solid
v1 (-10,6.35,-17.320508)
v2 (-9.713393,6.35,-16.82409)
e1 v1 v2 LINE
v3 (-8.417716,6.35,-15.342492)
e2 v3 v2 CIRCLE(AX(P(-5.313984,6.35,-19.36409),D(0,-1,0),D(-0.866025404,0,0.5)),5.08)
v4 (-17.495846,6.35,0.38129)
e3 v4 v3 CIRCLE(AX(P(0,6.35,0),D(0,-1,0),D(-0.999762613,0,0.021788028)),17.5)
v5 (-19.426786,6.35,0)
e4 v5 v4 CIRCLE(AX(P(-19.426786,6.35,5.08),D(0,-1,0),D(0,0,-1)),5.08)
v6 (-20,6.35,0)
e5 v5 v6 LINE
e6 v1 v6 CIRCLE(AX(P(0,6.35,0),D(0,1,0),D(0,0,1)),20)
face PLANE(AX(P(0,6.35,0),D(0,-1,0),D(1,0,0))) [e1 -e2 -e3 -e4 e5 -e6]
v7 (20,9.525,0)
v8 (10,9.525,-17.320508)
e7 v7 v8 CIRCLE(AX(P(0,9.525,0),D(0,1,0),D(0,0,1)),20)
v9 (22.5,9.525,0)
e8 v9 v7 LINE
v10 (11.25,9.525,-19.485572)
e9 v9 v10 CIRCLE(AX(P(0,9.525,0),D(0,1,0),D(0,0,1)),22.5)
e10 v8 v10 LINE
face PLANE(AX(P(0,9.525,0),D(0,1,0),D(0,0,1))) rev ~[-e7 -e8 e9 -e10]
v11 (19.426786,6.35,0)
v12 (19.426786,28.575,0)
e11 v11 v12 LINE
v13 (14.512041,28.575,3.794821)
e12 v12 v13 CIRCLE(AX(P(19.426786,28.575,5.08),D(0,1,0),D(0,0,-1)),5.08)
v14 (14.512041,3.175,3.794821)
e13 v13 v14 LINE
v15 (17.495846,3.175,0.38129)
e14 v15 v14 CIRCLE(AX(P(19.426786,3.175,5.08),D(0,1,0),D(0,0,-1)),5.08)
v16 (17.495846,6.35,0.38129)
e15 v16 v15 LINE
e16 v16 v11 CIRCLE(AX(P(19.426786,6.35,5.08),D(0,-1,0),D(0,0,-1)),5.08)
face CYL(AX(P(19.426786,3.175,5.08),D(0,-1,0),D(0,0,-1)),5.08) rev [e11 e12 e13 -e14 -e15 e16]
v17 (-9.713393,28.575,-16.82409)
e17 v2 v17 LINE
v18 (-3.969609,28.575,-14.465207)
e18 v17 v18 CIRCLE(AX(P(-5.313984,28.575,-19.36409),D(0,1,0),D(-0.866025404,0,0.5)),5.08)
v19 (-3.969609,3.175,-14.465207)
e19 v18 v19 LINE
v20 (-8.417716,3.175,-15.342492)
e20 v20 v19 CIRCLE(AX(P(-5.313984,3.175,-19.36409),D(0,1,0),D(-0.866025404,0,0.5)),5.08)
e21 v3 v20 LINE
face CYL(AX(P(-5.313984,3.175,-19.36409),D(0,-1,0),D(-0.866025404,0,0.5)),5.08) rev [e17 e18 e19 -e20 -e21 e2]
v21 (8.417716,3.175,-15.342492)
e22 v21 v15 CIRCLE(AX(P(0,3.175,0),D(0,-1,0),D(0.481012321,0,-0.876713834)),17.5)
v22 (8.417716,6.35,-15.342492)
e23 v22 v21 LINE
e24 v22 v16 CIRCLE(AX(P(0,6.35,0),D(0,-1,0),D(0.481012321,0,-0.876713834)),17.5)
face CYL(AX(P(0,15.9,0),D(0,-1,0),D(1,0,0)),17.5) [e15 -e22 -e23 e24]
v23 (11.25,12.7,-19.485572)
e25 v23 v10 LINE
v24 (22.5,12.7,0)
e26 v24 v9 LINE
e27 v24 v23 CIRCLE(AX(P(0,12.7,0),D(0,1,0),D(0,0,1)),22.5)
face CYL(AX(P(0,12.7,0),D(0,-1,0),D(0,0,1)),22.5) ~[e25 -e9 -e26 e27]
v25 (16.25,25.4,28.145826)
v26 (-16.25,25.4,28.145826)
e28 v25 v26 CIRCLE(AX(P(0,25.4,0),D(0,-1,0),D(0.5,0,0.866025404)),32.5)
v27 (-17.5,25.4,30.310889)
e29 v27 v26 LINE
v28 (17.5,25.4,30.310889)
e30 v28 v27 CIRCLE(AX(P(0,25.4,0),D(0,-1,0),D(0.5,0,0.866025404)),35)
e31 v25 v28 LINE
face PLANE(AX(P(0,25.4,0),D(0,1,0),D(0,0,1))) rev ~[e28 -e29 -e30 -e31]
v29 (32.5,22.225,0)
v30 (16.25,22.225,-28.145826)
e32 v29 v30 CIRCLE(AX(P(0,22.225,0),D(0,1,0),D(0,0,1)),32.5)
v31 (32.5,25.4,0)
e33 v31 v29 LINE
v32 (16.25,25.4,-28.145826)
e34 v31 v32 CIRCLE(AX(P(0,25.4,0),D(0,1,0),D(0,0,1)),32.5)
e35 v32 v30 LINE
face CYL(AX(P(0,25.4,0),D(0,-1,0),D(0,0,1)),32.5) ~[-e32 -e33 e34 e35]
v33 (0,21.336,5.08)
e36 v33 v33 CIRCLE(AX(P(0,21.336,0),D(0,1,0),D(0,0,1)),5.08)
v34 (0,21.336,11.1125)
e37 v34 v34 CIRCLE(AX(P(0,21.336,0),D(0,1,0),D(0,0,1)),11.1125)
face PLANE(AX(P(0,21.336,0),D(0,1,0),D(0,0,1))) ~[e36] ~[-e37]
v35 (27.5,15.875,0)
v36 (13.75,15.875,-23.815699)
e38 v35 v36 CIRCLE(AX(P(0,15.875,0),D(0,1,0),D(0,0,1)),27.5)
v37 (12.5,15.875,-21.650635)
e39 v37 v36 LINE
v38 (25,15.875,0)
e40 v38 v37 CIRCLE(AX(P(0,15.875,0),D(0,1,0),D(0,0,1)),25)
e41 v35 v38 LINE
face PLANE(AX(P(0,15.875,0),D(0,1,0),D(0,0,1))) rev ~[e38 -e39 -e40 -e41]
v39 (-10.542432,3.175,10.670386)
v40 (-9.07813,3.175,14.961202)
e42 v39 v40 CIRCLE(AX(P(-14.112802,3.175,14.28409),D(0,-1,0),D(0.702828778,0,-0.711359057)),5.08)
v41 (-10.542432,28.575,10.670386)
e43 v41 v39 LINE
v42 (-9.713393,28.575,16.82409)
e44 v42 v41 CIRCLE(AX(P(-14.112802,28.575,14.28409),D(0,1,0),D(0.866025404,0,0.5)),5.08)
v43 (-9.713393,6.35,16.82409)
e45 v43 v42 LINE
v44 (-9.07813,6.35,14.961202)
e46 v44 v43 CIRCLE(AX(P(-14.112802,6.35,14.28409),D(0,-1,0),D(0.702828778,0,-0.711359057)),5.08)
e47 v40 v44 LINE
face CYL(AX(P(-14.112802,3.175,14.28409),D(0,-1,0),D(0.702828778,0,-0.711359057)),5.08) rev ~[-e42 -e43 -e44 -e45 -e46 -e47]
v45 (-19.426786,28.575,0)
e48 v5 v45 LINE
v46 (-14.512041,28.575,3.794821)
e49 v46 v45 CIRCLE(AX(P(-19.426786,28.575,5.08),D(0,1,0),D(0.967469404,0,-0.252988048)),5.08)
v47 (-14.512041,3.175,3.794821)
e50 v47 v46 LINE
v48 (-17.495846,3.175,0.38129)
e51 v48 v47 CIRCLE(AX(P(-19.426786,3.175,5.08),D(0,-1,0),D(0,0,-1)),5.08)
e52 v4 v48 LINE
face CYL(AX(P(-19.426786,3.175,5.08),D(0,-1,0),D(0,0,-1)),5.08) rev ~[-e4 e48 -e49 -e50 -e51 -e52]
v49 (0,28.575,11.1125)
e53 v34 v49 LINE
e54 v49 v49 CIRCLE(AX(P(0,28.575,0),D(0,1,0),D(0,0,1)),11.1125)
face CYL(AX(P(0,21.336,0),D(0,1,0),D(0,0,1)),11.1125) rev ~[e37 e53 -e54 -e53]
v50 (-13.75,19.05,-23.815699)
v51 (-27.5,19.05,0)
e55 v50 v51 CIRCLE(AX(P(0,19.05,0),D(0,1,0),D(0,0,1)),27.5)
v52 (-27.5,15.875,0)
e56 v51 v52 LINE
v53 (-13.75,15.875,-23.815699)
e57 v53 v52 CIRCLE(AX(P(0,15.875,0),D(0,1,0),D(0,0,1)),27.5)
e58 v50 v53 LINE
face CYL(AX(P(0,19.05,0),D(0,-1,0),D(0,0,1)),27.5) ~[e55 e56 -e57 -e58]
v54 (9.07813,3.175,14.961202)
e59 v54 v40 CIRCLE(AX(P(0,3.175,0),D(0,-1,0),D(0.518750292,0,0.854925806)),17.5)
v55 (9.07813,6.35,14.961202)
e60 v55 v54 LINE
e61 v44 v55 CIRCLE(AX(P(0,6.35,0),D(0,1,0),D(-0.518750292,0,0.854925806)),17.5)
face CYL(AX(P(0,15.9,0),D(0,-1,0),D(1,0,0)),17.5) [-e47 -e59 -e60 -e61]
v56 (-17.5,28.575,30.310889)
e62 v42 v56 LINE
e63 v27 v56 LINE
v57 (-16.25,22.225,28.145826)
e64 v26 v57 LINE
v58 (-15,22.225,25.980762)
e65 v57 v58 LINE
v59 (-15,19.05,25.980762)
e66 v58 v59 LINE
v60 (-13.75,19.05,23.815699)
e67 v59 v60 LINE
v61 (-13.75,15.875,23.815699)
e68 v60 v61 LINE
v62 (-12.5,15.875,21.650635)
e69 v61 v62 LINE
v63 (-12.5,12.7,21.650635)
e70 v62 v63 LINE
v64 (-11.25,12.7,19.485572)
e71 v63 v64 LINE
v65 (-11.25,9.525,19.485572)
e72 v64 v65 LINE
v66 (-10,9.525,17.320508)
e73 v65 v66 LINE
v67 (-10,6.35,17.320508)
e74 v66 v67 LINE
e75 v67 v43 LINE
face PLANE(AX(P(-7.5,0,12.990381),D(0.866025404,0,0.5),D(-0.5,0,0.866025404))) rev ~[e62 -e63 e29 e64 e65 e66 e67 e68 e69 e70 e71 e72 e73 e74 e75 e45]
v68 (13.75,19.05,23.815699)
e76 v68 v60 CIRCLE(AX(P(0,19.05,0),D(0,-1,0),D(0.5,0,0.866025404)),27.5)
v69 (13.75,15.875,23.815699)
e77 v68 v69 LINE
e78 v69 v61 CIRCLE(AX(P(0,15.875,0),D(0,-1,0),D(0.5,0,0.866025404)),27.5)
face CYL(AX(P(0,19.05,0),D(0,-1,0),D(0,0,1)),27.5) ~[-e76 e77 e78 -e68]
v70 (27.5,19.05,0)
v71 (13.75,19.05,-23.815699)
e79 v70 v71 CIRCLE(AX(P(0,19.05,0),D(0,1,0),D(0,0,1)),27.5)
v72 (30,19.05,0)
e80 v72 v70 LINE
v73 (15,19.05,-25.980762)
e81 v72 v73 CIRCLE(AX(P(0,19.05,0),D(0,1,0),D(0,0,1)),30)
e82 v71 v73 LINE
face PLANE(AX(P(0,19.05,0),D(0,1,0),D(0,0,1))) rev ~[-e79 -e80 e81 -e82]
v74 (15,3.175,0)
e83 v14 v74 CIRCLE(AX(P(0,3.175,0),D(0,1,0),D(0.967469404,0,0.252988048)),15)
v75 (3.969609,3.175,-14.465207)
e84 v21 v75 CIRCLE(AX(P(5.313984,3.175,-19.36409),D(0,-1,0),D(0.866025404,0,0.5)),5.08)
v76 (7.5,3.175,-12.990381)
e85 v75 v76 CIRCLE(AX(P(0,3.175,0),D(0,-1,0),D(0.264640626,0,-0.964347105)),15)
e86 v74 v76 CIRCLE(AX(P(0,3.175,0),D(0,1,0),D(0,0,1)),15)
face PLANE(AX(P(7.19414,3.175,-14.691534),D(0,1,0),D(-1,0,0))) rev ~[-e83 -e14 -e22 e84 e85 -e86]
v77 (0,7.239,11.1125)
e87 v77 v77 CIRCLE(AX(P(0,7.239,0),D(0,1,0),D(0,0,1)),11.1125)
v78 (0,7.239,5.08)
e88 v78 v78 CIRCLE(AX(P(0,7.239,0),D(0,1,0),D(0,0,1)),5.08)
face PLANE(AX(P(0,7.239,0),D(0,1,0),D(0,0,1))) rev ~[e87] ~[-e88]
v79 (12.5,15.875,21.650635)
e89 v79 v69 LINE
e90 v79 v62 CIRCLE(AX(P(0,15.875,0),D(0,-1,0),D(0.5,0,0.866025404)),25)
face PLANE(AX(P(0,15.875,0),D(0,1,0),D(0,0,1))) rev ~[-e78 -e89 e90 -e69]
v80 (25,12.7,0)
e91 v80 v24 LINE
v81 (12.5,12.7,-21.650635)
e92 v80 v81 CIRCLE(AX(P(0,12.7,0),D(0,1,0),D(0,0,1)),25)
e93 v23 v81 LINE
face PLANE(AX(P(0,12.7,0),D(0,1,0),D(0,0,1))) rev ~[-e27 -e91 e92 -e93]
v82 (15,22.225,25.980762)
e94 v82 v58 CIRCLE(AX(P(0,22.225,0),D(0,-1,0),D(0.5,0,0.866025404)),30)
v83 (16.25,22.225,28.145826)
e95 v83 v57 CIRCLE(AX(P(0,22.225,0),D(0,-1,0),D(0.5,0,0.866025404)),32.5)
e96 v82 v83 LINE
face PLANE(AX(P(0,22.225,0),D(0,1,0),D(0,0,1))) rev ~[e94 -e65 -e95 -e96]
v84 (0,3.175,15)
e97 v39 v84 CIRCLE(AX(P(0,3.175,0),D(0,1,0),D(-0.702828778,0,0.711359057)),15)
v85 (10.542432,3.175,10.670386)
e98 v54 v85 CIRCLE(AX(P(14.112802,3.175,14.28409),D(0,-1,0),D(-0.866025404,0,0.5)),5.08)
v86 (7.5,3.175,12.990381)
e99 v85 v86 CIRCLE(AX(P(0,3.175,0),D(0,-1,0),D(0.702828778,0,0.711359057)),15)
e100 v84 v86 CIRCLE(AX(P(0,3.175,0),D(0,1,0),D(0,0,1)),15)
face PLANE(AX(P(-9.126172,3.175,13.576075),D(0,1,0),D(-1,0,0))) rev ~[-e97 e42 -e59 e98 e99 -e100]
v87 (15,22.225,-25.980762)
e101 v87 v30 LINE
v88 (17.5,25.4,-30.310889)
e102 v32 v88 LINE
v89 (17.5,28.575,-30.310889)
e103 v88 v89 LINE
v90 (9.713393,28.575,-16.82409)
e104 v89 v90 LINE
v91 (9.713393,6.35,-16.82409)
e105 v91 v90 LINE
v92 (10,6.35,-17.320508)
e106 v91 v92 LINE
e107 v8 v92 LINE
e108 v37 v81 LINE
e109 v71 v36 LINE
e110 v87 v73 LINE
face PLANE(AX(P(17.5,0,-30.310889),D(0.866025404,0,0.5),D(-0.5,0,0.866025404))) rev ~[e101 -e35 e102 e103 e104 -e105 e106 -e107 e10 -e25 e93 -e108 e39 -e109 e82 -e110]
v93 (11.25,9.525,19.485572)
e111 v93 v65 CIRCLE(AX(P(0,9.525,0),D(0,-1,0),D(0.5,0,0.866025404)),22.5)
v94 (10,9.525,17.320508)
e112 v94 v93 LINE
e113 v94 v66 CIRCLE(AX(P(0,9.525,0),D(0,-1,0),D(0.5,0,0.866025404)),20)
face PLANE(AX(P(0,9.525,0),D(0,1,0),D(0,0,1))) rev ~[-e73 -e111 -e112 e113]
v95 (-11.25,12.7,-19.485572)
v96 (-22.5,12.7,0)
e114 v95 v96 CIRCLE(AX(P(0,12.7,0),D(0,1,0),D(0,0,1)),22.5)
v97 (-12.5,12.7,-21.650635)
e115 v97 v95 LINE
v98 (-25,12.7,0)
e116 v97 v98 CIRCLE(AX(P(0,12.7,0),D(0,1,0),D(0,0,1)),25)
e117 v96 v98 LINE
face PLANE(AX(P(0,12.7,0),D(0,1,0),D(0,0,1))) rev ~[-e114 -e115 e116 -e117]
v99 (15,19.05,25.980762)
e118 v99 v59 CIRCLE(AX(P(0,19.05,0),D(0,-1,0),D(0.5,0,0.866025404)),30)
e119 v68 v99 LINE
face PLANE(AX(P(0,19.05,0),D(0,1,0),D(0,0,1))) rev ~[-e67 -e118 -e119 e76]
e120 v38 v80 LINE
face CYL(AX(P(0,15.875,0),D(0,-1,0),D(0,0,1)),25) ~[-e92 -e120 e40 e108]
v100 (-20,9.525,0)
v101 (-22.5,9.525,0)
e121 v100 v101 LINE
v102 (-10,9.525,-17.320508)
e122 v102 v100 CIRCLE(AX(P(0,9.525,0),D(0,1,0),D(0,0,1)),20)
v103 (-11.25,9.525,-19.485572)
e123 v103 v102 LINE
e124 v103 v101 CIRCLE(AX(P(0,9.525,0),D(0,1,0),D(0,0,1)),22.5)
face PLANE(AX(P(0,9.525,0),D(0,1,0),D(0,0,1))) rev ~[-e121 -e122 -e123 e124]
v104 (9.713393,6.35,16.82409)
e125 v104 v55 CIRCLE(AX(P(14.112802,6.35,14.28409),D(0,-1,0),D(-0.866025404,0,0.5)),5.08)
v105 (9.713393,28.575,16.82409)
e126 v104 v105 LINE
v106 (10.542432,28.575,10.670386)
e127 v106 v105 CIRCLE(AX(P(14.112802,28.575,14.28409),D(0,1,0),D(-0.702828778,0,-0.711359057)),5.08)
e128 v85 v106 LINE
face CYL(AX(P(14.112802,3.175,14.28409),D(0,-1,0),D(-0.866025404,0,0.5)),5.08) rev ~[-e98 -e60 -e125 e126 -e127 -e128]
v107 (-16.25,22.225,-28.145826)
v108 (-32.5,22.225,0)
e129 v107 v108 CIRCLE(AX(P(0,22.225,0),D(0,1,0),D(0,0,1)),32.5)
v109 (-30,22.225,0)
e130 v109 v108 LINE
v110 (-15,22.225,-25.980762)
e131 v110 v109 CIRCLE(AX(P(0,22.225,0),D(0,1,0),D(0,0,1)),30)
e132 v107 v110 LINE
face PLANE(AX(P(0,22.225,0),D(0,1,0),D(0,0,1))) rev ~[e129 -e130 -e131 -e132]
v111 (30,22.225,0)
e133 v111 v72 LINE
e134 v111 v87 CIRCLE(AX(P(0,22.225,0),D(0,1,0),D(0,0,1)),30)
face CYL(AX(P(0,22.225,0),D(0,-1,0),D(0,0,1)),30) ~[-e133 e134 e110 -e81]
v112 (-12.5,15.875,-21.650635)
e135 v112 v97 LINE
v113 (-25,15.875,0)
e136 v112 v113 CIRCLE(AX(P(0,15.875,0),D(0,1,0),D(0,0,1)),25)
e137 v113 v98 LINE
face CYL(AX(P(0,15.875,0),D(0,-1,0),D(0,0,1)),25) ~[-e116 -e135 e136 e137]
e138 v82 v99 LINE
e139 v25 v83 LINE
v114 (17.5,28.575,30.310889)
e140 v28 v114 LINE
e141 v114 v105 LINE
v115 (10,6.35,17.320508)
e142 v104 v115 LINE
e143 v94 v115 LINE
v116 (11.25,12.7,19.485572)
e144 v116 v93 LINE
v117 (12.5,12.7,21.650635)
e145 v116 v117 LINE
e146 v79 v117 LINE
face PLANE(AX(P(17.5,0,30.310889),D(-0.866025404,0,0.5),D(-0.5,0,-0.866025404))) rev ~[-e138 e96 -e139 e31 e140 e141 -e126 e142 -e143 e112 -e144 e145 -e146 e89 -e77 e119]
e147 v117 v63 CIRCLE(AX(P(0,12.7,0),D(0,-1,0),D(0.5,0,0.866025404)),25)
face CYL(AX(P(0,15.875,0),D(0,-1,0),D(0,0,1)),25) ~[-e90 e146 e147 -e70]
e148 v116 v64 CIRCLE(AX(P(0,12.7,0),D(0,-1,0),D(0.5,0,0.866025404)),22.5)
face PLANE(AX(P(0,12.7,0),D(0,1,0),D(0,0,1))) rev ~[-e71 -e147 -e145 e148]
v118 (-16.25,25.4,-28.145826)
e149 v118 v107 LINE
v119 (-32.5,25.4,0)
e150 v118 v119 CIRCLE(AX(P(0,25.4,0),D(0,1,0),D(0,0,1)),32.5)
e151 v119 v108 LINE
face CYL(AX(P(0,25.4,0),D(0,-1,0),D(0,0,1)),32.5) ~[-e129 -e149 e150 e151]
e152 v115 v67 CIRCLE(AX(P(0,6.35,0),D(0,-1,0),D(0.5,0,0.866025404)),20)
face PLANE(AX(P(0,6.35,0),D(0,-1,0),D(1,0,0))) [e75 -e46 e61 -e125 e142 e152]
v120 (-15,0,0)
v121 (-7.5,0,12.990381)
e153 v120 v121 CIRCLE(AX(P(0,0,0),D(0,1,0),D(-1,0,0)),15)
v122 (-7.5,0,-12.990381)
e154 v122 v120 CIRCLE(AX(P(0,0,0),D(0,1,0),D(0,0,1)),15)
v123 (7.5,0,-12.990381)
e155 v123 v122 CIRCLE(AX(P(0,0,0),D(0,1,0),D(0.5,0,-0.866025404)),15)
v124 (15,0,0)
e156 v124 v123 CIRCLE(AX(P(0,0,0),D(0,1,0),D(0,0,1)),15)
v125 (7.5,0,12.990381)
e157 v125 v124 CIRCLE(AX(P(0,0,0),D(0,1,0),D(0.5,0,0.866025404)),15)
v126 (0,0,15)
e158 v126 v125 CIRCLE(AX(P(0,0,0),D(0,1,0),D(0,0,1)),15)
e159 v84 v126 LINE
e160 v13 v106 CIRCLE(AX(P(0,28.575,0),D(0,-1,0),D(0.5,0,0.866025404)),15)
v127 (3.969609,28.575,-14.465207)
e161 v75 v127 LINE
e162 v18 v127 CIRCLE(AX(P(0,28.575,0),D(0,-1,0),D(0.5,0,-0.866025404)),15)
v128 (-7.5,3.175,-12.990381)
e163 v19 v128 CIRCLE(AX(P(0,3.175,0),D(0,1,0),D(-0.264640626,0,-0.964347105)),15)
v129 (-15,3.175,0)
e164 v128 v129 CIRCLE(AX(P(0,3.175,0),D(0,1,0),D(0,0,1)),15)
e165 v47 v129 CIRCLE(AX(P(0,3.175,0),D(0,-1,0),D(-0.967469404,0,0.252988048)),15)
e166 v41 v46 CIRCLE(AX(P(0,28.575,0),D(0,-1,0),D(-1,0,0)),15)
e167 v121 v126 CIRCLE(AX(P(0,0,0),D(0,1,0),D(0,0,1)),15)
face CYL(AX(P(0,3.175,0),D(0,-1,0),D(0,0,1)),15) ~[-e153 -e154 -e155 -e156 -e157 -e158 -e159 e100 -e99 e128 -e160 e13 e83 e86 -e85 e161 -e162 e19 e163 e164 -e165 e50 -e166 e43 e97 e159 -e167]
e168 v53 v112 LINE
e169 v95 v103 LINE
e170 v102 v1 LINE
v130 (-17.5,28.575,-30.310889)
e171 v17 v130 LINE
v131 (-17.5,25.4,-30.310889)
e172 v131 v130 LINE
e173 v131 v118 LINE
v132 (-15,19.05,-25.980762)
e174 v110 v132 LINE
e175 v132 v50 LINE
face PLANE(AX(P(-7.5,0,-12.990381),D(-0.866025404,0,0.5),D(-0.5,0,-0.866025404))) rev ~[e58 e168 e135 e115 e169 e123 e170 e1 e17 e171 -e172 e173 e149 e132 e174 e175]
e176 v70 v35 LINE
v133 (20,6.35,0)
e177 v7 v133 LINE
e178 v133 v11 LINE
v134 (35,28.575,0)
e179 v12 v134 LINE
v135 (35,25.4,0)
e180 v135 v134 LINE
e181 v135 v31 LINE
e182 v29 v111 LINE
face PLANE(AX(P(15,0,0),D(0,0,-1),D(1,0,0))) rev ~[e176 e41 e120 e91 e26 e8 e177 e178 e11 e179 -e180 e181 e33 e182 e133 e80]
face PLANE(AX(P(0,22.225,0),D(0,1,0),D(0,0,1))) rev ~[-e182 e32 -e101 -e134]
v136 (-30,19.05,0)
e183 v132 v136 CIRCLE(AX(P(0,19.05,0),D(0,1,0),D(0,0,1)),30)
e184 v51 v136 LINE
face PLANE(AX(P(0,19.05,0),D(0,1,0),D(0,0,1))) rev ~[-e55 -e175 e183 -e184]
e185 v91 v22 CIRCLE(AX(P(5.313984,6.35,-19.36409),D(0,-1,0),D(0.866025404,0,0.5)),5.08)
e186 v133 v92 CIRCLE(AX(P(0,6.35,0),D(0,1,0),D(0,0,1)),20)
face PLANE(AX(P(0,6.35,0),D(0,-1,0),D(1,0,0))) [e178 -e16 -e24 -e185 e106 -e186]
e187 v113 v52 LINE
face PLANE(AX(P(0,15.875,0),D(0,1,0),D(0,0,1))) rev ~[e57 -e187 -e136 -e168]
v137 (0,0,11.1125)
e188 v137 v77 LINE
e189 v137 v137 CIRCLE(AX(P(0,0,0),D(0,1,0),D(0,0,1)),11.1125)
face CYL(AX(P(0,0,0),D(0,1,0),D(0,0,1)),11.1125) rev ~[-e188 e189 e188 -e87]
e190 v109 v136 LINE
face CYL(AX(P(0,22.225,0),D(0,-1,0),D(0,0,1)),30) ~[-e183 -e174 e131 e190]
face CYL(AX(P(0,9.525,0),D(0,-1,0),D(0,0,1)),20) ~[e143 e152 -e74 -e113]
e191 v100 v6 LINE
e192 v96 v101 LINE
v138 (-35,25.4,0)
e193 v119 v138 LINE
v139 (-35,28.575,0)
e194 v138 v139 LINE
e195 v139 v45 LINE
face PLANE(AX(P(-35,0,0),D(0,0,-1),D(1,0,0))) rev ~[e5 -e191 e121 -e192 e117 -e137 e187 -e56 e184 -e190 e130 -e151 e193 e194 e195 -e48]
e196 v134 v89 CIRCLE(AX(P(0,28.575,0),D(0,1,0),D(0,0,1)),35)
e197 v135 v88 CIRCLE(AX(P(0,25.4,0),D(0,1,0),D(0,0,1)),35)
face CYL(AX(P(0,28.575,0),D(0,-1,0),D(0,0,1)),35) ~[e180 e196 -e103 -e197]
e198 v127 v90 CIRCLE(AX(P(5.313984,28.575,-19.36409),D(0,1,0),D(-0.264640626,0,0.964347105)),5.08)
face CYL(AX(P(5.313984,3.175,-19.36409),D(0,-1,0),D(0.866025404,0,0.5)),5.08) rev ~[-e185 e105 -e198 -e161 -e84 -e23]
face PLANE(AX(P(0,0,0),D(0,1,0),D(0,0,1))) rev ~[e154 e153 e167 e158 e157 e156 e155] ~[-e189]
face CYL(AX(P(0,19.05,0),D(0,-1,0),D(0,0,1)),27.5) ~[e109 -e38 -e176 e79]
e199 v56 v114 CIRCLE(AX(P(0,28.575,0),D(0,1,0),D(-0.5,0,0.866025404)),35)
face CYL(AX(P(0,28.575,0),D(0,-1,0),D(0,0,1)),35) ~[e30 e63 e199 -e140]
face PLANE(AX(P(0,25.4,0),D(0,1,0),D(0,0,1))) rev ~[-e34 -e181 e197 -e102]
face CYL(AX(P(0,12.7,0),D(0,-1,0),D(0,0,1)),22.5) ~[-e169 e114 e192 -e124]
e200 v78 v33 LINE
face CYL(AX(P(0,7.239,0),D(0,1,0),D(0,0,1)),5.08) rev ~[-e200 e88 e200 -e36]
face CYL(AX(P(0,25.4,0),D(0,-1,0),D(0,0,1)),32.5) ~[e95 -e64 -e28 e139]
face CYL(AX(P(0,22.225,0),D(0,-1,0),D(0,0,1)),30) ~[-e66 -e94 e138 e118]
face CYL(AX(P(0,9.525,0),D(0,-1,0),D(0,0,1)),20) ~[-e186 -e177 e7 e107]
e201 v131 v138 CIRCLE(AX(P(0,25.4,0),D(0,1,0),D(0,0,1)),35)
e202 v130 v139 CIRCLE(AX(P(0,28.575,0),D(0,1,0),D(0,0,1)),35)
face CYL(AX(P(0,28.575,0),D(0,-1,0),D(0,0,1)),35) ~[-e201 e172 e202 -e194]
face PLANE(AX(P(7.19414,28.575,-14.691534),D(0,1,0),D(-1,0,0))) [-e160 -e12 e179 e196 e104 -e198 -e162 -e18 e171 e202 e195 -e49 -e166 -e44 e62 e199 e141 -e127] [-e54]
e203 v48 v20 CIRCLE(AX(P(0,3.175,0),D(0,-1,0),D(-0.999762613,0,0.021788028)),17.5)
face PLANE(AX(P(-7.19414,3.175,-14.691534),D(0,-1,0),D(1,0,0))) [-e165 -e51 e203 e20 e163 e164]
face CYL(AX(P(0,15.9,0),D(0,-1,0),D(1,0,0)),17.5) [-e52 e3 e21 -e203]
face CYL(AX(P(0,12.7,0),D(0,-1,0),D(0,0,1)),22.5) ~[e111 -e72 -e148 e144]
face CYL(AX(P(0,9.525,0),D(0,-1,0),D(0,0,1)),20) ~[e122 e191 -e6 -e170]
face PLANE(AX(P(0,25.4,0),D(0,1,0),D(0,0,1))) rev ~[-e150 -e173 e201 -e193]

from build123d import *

# Parameters (mm, degrees)
F3_DEPTH      = 28.576
F4_T4_DEPTH   = 25.4
F4_S5_R       = 17.5
F4_T6_DEPTH   = 15
F4_T11_DEPTH  = 25.4
F4_S12_R      = 17.5
F4_T13_DEPTH  = 15
F4_T18_DEPTH  = 25.4
F4_S19_R      = 17.5
F4_T20_DEPTH  = 15
F4_T25_DEPTH  = 25.4
F4_S27_R      = 17.5
F4_T28_DEPTH  = 15
F4_T32_DEPTH  = 25.4
F4_S34_R      = 17.5
F4_T35_DEPTH  = 15
F4_T39_DEPTH  = 25.4
F4_S41_R      = 17.5
F4_T42_DEPTH  = 15
F4_T46_DEPTH  = 25.4
F4_S47_R      = 17.5
F4_T48_DEPTH  = 15
F4_T53_DEPTH  = 25.4
F4_S54_R      = 17.5
F4_T55_DEPTH  = 15
F4_T60_DEPTH  = 25.4
F4_S61_R      = 17.5
F4_T62_DEPTH  = 15
F4_T67_DEPTH  = 25.4
F4_S69_R      = 17.5
F4_T70_DEPTH  = 15
F4_T74_DEPTH  = 25.4
F4_S76_R      = 17.5
F4_T77_DEPTH  = 15
F4_T81_DEPTH  = 25.4
F4_S83_R      = 17.5
F4_T84_DEPTH  = 15
F4_T88_DEPTH  = 25.4
F4_S89_R      = 17.5
F4_T90_DEPTH  = 15
F4_T95_DEPTH  = 25.4
F4_S96_R      = 17.5
F4_T97_DEPTH  = 15
F4_T102_DEPTH = 25.4
F4_S103_R     = 17.5
F4_T104_DEPTH = 15
F4_T109_DEPTH = 25.4
F4_S111_R     = 17.5
F4_T112_DEPTH = 15
F4_T116_DEPTH = 25.4
F4_S118_R     = 17.5
F4_T119_DEPTH = 15
F4_T123_DEPTH = 25.4
F4_S125_R     = 17.5
F4_T126_DEPTH = 15


# Not quite as in the source:
# - a fillet or chamfer that OpenCascade refuses, or shapes differently, is made with other operations: its cross-section is extruded or revolved along the edge and cut away or added


with BuildPart() as f1:
    # F0 (on Right) → F1 (revolve)
    with BuildSketch(Plane.YZ):
        Polygon((0, 15), (0, 11.1125), (7.239, 11.1125), (7.239, 5.08), (21.336, 5.08), (21.336, 11.1125), (28.575, 11.1125), (28.575, 35), (25.4, 35), (25.4, 32.5), (22.225, 32.5), (22.225, 30), (19.05, 30), (19.05, 27.5), (15.875, 27.5), (15.875, 25), (12.7, 25), (12.7, 22.5), (9.525, 22.5), (9.525, 20), (6.35, 20), (6.35, 17.5), (3.175, 17.5), (3.175, 15), align=None)
    revolve(axis=Axis((0, 14.2875, 0), (0, 1, 0)))

    # F2 (on Front) → F3 (cut, through all)
    with BuildSketch(Plane.XZ):
        with BuildLine():
            ThreePointArc((-15, 0), (-12.9903810568, 7.5), (-7.5, 12.9903810568))
            Line((-7.5, 12.9903810568), (-17.5, 30.3108891325))
            ThreePointArc((-17.5, 30.3108891325), (-30.3108891325, 17.5), (-35, 0))
            Line((-35, 0), (-15, 0))
        make_face()
        with BuildLine():
            ThreePointArc((7.5, 12.9903810568), (12.9903810568, 7.5), (15, 0))
            Line((15, 0), (35, 0))
            ThreePointArc((35, 0), (30.3108891325, 17.5), (17.5, 30.3108891325))
            Line((17.5, 30.3108891325), (7.5, 12.9903810568))
        make_face()
        with BuildLine():
            Line((17.5, -30.3108891325), (7.5, -12.9903810568))
            ThreePointArc((7.5, -12.9903810568), (0, -15), (-7.5, -12.9903810568))
            Line((-7.5, -12.9903810568), (-17.5, -30.3108891325))
            ThreePointArc((-17.5, -30.3108891325), (0, -35), (17.5, -30.3108891325))
        make_face()
    extrude(amount=-F3_DEPTH, mode=Mode.SUBTRACT)

    # F4: fillet of radius 5.08 on 6 edges, made by hand


with BuildPart() as f4_tool2:
    # F4_s3 → F4_t4 (new body)
    with BuildSketch(Plane.XZ.offset(-3.175)):
        with BuildLine():
            ThreePointArc((19.4267856322, 0), (16.3221367597, 1.059110126), (14.5120410599, 3.7948207171))
            ThreePointArc((14.5120410599, 3.7948207171), (14.8775101394, 1.9130321614), (15, 0))
            Line((15, 0), (19.4267856322, 0))
        make_face()
    extrude(amount=-F4_T4_DEPTH)

    # F4_s5 → F4_t6 (intersect, symmetric)
    with BuildSketch(Plane.XZ.offset(-15.9)):
        Circle(F4_S5_R)
    extrude(amount=F4_T6_DEPTH, both=True, mode=Mode.INTERSECT)

    split(bisect_by=Plane.XZ.offset(-6.35), keep=Keep.TOP)


with BuildPart() as f1_1:
    add(f1.part)

    # F4_t1: union F4_tool2
    add(f4_tool2.part)


with BuildPart() as f4_tool9:
    # F4_s10 → F4_t11 (new body)
    with BuildSketch(Plane.XZ.offset(-3.175)):
        with BuildLine():
            ThreePointArc((19.4267856322, 0), (16.3221367597, 1.059110126), (14.5120410599, 3.7948207171))
            ThreePointArc((14.5120410599, 3.7948207171), (14.8775101394, 1.9130321614), (15, 0))
            Line((15, 0), (19.4267856322, 0))
        make_face()
    extrude(amount=-F4_T11_DEPTH)

    # F4_s12 → F4_t13 (cut, symmetric)
    with BuildSketch(Plane.XZ.offset(-15.9)):
        Circle(F4_S12_R)
    extrude(amount=F4_T13_DEPTH, both=True, mode=Mode.SUBTRACT)

    split(bisect_by=Plane.XZ.offset(-6.35), keep=Keep.BOTTOM)


with BuildPart() as f1_2:
    add(f1_1.part)

    # F4_t8: union F4_tool9
    add(f4_tool9.part)


with BuildPart() as f4_tool16:
    # F4_s17 → F4_t18 (new body)
    with BuildSketch(Plane.XZ.offset(-3.175)):
        with BuildLine():
            ThreePointArc((19.4267856322, 0), (16.3221367597, 1.059110126), (14.5120410599, 3.7948207171))
            ThreePointArc((14.5120410599, 3.7948207171), (14.8775101394, 1.9130321614), (15, 0))
            Line((15, 0), (19.4267856322, 0))
        make_face()
    extrude(amount=-F4_T18_DEPTH)

    # F4_s19 → F4_t20 (intersect, symmetric)
    with BuildSketch(Plane.XZ.offset(-15.9)):
        Circle(F4_S19_R)
    extrude(amount=F4_T20_DEPTH, both=True, mode=Mode.INTERSECT)

    split(bisect_by=Plane.XZ.offset(-6.35), keep=Keep.BOTTOM)


with BuildPart() as f1_3:
    add(f1_2.part)

    # F4_t15: union F4_tool16
    add(f4_tool16.part)


with BuildPart() as f4_tool23:
    # F4_s24 → F4_t25 (new body)
    with BuildSketch(Plane.XZ.offset(-3.175)):
        with BuildLine():
            ThreePointArc((9.7133928161, 16.8240898714), (9.0782846544, 13.6058300149), (10.5424316738, 10.6703858601))
            ThreePointArc((10.5424316738, 10.6703858601), (9.0954895198, 11.9277856451), (7.5, 12.9903810568))
            Line((7.5, 12.9903810568), (9.7133928161, 16.8240898714))
        make_face()
    extrude(amount=-F4_T25_DEPTH)

    split(bisect_by=Plane.XZ.offset(-6.35), keep=Keep.TOP)

    # F4_s27 → F4_t28 (intersect, symmetric)
    with BuildSketch(Plane.XZ.offset(-15.9)):
        Circle(F4_S27_R)
    extrude(amount=F4_T28_DEPTH, both=True, mode=Mode.INTERSECT)


with BuildPart() as f1_4:
    add(f1_3.part)

    # F4_t22: union F4_tool23
    add(f4_tool23.part)


with BuildPart() as f4_tool30:
    # F4_s31 → F4_t32 (new body)
    with BuildSketch(Plane.XZ.offset(-3.175)):
        with BuildLine():
            ThreePointArc((9.7133928161, 16.8240898714), (9.0782846544, 13.6058300149), (10.5424316738, 10.6703858601))
            ThreePointArc((10.5424316738, 10.6703858601), (9.0954895198, 11.9277856451), (7.5, 12.9903810568))
            Line((7.5, 12.9903810568), (9.7133928161, 16.8240898714))
        make_face()
    extrude(amount=-F4_T32_DEPTH)

    split(bisect_by=Plane.XZ.offset(-6.35), keep=Keep.BOTTOM)

    # F4_s34 → F4_t35 (cut, symmetric)
    with BuildSketch(Plane.XZ.offset(-15.9)):
        Circle(F4_S34_R)
    extrude(amount=F4_T35_DEPTH, both=True, mode=Mode.SUBTRACT)


with BuildPart() as f1_5:
    add(f1_4.part)

    # F4_t29: union F4_tool30
    add(f4_tool30.part)


with BuildPart() as f4_tool37:
    # F4_s38 → F4_t39 (new body)
    with BuildSketch(Plane.XZ.offset(-3.175)):
        with BuildLine():
            ThreePointArc((9.7133928161, 16.8240898714), (9.0782846544, 13.6058300149), (10.5424316738, 10.6703858601))
            ThreePointArc((10.5424316738, 10.6703858601), (9.0954895198, 11.9277856451), (7.5, 12.9903810568))
            Line((7.5, 12.9903810568), (9.7133928161, 16.8240898714))
        make_face()
    extrude(amount=-F4_T39_DEPTH)

    split(bisect_by=Plane.XZ.offset(-6.35), keep=Keep.BOTTOM)

    # F4_s41 → F4_t42 (intersect, symmetric)
    with BuildSketch(Plane.XZ.offset(-15.9)):
        Circle(F4_S41_R)
    extrude(amount=F4_T42_DEPTH, both=True, mode=Mode.INTERSECT)


with BuildPart() as f1_6:
    add(f1_5.part)

    # F4_t36: union F4_tool37
    add(f4_tool37.part)


with BuildPart() as f4_tool44:
    # F4_s45 → F4_t46 (new body)
    with BuildSketch(Plane.XZ.offset(-3.175)):
        with BuildLine():
            ThreePointArc((-10.5424316738, 10.6703858601), (-9.0782846544, 13.6058300149), (-9.7133928161, 16.8240898714))
            Line((-9.7133928161, 16.8240898714), (-7.5, 12.9903810568))
            ThreePointArc((-7.5, 12.9903810568), (-9.0954895198, 11.9277856451), (-10.5424316738, 10.6703858601))
        make_face()
    extrude(amount=-F4_T46_DEPTH)

    # F4_s47 → F4_t48 (intersect, symmetric)
    with BuildSketch(Plane.XZ.offset(-15.9)):
        Circle(F4_S47_R)
    extrude(amount=F4_T48_DEPTH, both=True, mode=Mode.INTERSECT)

    split(bisect_by=Plane.XZ.offset(-6.35), keep=Keep.TOP)


with BuildPart() as f1_7:
    add(f1_6.part)

    # F4_t43: union F4_tool44
    add(f4_tool44.part)


with BuildPart() as f4_tool51:
    # F4_s52 → F4_t53 (new body)
    with BuildSketch(Plane.XZ.offset(-3.175)):
        with BuildLine():
            ThreePointArc((-10.5424316738, 10.6703858601), (-9.0782846544, 13.6058300149), (-9.7133928161, 16.8240898714))
            Line((-9.7133928161, 16.8240898714), (-7.5, 12.9903810568))
            ThreePointArc((-7.5, 12.9903810568), (-9.0954895198, 11.9277856451), (-10.5424316738, 10.6703858601))
        make_face()
    extrude(amount=-F4_T53_DEPTH)

    # F4_s54 → F4_t55 (intersect, symmetric)
    with BuildSketch(Plane.XZ.offset(-15.9)):
        Circle(F4_S54_R)
    extrude(amount=F4_T55_DEPTH, both=True, mode=Mode.INTERSECT)

    split(bisect_by=Plane.XZ.offset(-6.35), keep=Keep.BOTTOM)


with BuildPart() as f1_8:
    add(f1_7.part)

    # F4_t50: union F4_tool51
    add(f4_tool51.part)


with BuildPart() as f4_tool58:
    # F4_s59 → F4_t60 (new body)
    with BuildSketch(Plane.XZ.offset(-3.175)):
        with BuildLine():
            ThreePointArc((-10.5424316738, 10.6703858601), (-9.0782846544, 13.6058300149), (-9.7133928161, 16.8240898714))
            Line((-9.7133928161, 16.8240898714), (-7.5, 12.9903810568))
            ThreePointArc((-7.5, 12.9903810568), (-9.0954895198, 11.9277856451), (-10.5424316738, 10.6703858601))
        make_face()
    extrude(amount=-F4_T60_DEPTH)

    # F4_s61 → F4_t62 (cut, symmetric)
    with BuildSketch(Plane.XZ.offset(-15.9)):
        Circle(F4_S61_R)
    extrude(amount=F4_T62_DEPTH, both=True, mode=Mode.SUBTRACT)

    split(bisect_by=Plane.XZ.offset(-6.35), keep=Keep.BOTTOM)


with BuildPart() as f1_9:
    add(f1_8.part)

    # F4_t57: union F4_tool58
    add(f4_tool58.part)


with BuildPart() as f4_tool65:
    # F4_s66 → F4_t67 (new body)
    with BuildSketch(Plane.XZ.offset(-3.175)):
        with BuildLine():
            ThreePointArc((-19.4267856322, 0), (-16.3221367597, 1.059110126), (-14.5120410599, 3.7948207171))
            ThreePointArc((-14.5120410599, 3.7948207171), (-14.8775101394, 1.9130321614), (-15, 0))
            Line((-15, 0), (-19.4267856322, 0))
        make_face()
    extrude(amount=-F4_T67_DEPTH)

    split(bisect_by=Plane.XZ.offset(-6.35), keep=Keep.TOP)

    # F4_s69 → F4_t70 (intersect, symmetric)
    with BuildSketch(Plane.XZ.offset(-15.9)):
        Circle(F4_S69_R)
    extrude(amount=F4_T70_DEPTH, both=True, mode=Mode.INTERSECT)


with BuildPart() as f1_10:
    add(f1_9.part)

    # F4_t64: union F4_tool65
    add(f4_tool65.part)


with BuildPart() as f4_tool72:
    # F4_s73 → F4_t74 (new body)
    with BuildSketch(Plane.XZ.offset(-3.175)):
        with BuildLine():
            ThreePointArc((-19.4267856322, 0), (-16.3221367597, 1.059110126), (-14.5120410599, 3.7948207171))
            ThreePointArc((-14.5120410599, 3.7948207171), (-14.8775101394, 1.9130321614), (-15, 0))
            Line((-15, 0), (-19.4267856322, 0))
        make_face()
    extrude(amount=-F4_T74_DEPTH)

    split(bisect_by=Plane.XZ.offset(-6.35), keep=Keep.BOTTOM)

    # F4_s76 → F4_t77 (cut, symmetric)
    with BuildSketch(Plane.XZ.offset(-15.9)):
        Circle(F4_S76_R)
    extrude(amount=F4_T77_DEPTH, both=True, mode=Mode.SUBTRACT)


with BuildPart() as f1_11:
    add(f1_10.part)

    # F4_t71: union F4_tool72
    add(f4_tool72.part)


with BuildPart() as f4_tool79:
    # F4_s80 → F4_t81 (new body)
    with BuildSketch(Plane.XZ.offset(-3.175)):
        with BuildLine():
            ThreePointArc((-19.4267856322, 0), (-16.3221367597, 1.059110126), (-14.5120410599, 3.7948207171))
            ThreePointArc((-14.5120410599, 3.7948207171), (-14.8775101394, 1.9130321614), (-15, 0))
            Line((-15, 0), (-19.4267856322, 0))
        make_face()
    extrude(amount=-F4_T81_DEPTH)

    split(bisect_by=Plane.XZ.offset(-6.35), keep=Keep.BOTTOM)

    # F4_s83 → F4_t84 (intersect, symmetric)
    with BuildSketch(Plane.XZ.offset(-15.9)):
        Circle(F4_S83_R)
    extrude(amount=F4_T84_DEPTH, both=True, mode=Mode.INTERSECT)


with BuildPart() as f1_12:
    add(f1_11.part)

    # F4_t78: union F4_tool79
    add(f4_tool79.part)


with BuildPart() as f4_tool86:
    # F4_s87 → F4_t88 (new body)
    with BuildSketch(Plane.XZ.offset(-3.175)):
        with BuildLine():
            ThreePointArc((-9.7133928161, -16.8240898714), (-7.2438521053, -14.664940141), (-3.9696093861, -14.4652065772))
            ThreePointArc((-3.9696093861, -14.4652065772), (-5.7820206197, -13.8408178065), (-7.5, -12.9903810568))
            Line((-7.5, -12.9903810568), (-9.7133928161, -16.8240898714))
        make_face()
    extrude(amount=-F4_T88_DEPTH)

    # F4_s89 → F4_t90 (intersect, symmetric)
    with BuildSketch(Plane.XZ.offset(-15.9)):
        Circle(F4_S89_R)
    extrude(amount=F4_T90_DEPTH, both=True, mode=Mode.INTERSECT)

    split(bisect_by=Plane.XZ.offset(-6.35), keep=Keep.TOP)


with BuildPart() as f1_13:
    add(f1_12.part)

    # F4_t85: union F4_tool86
    add(f4_tool86.part)


with BuildPart() as f4_tool93:
    # F4_s94 → F4_t95 (new body)
    with BuildSketch(Plane.XZ.offset(-3.175)):
        with BuildLine():
            ThreePointArc((-9.7133928161, -16.8240898714), (-7.2438521053, -14.664940141), (-3.9696093861, -14.4652065772))
            ThreePointArc((-3.9696093861, -14.4652065772), (-5.7820206197, -13.8408178065), (-7.5, -12.9903810568))
            Line((-7.5, -12.9903810568), (-9.7133928161, -16.8240898714))
        make_face()
    extrude(amount=-F4_T95_DEPTH)

    # F4_s96 → F4_t97 (cut, symmetric)
    with BuildSketch(Plane.XZ.offset(-15.9)):
        Circle(F4_S96_R)
    extrude(amount=F4_T97_DEPTH, both=True, mode=Mode.SUBTRACT)

    split(bisect_by=Plane.XZ.offset(-6.35), keep=Keep.BOTTOM)


with BuildPart() as f1_14:
    add(f1_13.part)

    # F4_t92: union F4_tool93
    add(f4_tool93.part)


with BuildPart() as f4_tool100:
    # F4_s101 → F4_t102 (new body)
    with BuildSketch(Plane.XZ.offset(-3.175)):
        with BuildLine():
            ThreePointArc((-9.7133928161, -16.8240898714), (-7.2438521053, -14.664940141), (-3.9696093861, -14.4652065772))
            ThreePointArc((-3.9696093861, -14.4652065772), (-5.7820206197, -13.8408178065), (-7.5, -12.9903810568))
            Line((-7.5, -12.9903810568), (-9.7133928161, -16.8240898714))
        make_face()
    extrude(amount=-F4_T102_DEPTH)

    # F4_s103 → F4_t104 (intersect, symmetric)
    with BuildSketch(Plane.XZ.offset(-15.9)):
        Circle(F4_S103_R)
    extrude(amount=F4_T104_DEPTH, both=True, mode=Mode.INTERSECT)

    split(bisect_by=Plane.XZ.offset(-6.35), keep=Keep.BOTTOM)


with BuildPart() as f1_15:
    add(f1_14.part)

    # F4_t99: union F4_tool100
    add(f4_tool100.part)


with BuildPart() as f4_tool107:
    # F4_s108 → F4_t109 (new body)
    with BuildSketch(Plane.XZ.offset(-3.175)):
        with BuildLine():
            ThreePointArc((9.7133928161, -16.8240898714), (7.2438521053, -14.664940141), (3.9696093861, -14.4652065772))
            ThreePointArc((3.9696093861, -14.4652065772), (5.7820206197, -13.8408178065), (7.5, -12.9903810568))
            Line((7.5, -12.9903810568), (9.7133928161, -16.8240898714))
        make_face()
    extrude(amount=-F4_T109_DEPTH)

    split(bisect_by=Plane.XZ.offset(-6.35), keep=Keep.TOP)

    # F4_s111 → F4_t112 (intersect, symmetric)
    with BuildSketch(Plane.XZ.offset(-15.9)):
        Circle(F4_S111_R)
    extrude(amount=F4_T112_DEPTH, both=True, mode=Mode.INTERSECT)


with BuildPart() as f1_16:
    add(f1_15.part)

    # F4_t106: union F4_tool107
    add(f4_tool107.part)


with BuildPart() as f4_tool114:
    # F4_s115 → F4_t116 (new body)
    with BuildSketch(Plane.XZ.offset(-3.175)):
        with BuildLine():
            ThreePointArc((9.7133928161, -16.8240898714), (7.2438521053, -14.664940141), (3.9696093861, -14.4652065772))
            ThreePointArc((3.9696093861, -14.4652065772), (5.7820206197, -13.8408178065), (7.5, -12.9903810568))
            Line((7.5, -12.9903810568), (9.7133928161, -16.8240898714))
        make_face()
    extrude(amount=-F4_T116_DEPTH)

    split(bisect_by=Plane.XZ.offset(-6.35), keep=Keep.BOTTOM)

    # F4_s118 → F4_t119 (cut, symmetric)
    with BuildSketch(Plane.XZ.offset(-15.9)):
        Circle(F4_S118_R)
    extrude(amount=F4_T119_DEPTH, both=True, mode=Mode.SUBTRACT)


with BuildPart() as f1_17:
    add(f1_16.part)

    # F4_t113: union F4_tool114
    add(f4_tool114.part)


with BuildPart() as f4_tool121:
    # F4_s122 → F4_t123 (new body)
    with BuildSketch(Plane.XZ.offset(-3.175)):
        with BuildLine():
            ThreePointArc((9.7133928161, -16.8240898714), (7.2438521053, -14.664940141), (3.9696093861, -14.4652065772))
            ThreePointArc((3.9696093861, -14.4652065772), (5.7820206197, -13.8408178065), (7.5, -12.9903810568))
            Line((7.5, -12.9903810568), (9.7133928161, -16.8240898714))
        make_face()
    extrude(amount=-F4_T123_DEPTH)

    split(bisect_by=Plane.XZ.offset(-6.35), keep=Keep.BOTTOM)

    # F4_s125 → F4_t126 (intersect, symmetric)
    with BuildSketch(Plane.XZ.offset(-15.9)):
        Circle(F4_S125_R)
    extrude(amount=F4_T126_DEPTH, both=True, mode=Mode.INTERSECT)


with BuildPart() as f1_18:
    add(f1_17.part)

    # F4_t120: union F4_tool121
    add(f4_tool121.part)


solid = f1_18.part
